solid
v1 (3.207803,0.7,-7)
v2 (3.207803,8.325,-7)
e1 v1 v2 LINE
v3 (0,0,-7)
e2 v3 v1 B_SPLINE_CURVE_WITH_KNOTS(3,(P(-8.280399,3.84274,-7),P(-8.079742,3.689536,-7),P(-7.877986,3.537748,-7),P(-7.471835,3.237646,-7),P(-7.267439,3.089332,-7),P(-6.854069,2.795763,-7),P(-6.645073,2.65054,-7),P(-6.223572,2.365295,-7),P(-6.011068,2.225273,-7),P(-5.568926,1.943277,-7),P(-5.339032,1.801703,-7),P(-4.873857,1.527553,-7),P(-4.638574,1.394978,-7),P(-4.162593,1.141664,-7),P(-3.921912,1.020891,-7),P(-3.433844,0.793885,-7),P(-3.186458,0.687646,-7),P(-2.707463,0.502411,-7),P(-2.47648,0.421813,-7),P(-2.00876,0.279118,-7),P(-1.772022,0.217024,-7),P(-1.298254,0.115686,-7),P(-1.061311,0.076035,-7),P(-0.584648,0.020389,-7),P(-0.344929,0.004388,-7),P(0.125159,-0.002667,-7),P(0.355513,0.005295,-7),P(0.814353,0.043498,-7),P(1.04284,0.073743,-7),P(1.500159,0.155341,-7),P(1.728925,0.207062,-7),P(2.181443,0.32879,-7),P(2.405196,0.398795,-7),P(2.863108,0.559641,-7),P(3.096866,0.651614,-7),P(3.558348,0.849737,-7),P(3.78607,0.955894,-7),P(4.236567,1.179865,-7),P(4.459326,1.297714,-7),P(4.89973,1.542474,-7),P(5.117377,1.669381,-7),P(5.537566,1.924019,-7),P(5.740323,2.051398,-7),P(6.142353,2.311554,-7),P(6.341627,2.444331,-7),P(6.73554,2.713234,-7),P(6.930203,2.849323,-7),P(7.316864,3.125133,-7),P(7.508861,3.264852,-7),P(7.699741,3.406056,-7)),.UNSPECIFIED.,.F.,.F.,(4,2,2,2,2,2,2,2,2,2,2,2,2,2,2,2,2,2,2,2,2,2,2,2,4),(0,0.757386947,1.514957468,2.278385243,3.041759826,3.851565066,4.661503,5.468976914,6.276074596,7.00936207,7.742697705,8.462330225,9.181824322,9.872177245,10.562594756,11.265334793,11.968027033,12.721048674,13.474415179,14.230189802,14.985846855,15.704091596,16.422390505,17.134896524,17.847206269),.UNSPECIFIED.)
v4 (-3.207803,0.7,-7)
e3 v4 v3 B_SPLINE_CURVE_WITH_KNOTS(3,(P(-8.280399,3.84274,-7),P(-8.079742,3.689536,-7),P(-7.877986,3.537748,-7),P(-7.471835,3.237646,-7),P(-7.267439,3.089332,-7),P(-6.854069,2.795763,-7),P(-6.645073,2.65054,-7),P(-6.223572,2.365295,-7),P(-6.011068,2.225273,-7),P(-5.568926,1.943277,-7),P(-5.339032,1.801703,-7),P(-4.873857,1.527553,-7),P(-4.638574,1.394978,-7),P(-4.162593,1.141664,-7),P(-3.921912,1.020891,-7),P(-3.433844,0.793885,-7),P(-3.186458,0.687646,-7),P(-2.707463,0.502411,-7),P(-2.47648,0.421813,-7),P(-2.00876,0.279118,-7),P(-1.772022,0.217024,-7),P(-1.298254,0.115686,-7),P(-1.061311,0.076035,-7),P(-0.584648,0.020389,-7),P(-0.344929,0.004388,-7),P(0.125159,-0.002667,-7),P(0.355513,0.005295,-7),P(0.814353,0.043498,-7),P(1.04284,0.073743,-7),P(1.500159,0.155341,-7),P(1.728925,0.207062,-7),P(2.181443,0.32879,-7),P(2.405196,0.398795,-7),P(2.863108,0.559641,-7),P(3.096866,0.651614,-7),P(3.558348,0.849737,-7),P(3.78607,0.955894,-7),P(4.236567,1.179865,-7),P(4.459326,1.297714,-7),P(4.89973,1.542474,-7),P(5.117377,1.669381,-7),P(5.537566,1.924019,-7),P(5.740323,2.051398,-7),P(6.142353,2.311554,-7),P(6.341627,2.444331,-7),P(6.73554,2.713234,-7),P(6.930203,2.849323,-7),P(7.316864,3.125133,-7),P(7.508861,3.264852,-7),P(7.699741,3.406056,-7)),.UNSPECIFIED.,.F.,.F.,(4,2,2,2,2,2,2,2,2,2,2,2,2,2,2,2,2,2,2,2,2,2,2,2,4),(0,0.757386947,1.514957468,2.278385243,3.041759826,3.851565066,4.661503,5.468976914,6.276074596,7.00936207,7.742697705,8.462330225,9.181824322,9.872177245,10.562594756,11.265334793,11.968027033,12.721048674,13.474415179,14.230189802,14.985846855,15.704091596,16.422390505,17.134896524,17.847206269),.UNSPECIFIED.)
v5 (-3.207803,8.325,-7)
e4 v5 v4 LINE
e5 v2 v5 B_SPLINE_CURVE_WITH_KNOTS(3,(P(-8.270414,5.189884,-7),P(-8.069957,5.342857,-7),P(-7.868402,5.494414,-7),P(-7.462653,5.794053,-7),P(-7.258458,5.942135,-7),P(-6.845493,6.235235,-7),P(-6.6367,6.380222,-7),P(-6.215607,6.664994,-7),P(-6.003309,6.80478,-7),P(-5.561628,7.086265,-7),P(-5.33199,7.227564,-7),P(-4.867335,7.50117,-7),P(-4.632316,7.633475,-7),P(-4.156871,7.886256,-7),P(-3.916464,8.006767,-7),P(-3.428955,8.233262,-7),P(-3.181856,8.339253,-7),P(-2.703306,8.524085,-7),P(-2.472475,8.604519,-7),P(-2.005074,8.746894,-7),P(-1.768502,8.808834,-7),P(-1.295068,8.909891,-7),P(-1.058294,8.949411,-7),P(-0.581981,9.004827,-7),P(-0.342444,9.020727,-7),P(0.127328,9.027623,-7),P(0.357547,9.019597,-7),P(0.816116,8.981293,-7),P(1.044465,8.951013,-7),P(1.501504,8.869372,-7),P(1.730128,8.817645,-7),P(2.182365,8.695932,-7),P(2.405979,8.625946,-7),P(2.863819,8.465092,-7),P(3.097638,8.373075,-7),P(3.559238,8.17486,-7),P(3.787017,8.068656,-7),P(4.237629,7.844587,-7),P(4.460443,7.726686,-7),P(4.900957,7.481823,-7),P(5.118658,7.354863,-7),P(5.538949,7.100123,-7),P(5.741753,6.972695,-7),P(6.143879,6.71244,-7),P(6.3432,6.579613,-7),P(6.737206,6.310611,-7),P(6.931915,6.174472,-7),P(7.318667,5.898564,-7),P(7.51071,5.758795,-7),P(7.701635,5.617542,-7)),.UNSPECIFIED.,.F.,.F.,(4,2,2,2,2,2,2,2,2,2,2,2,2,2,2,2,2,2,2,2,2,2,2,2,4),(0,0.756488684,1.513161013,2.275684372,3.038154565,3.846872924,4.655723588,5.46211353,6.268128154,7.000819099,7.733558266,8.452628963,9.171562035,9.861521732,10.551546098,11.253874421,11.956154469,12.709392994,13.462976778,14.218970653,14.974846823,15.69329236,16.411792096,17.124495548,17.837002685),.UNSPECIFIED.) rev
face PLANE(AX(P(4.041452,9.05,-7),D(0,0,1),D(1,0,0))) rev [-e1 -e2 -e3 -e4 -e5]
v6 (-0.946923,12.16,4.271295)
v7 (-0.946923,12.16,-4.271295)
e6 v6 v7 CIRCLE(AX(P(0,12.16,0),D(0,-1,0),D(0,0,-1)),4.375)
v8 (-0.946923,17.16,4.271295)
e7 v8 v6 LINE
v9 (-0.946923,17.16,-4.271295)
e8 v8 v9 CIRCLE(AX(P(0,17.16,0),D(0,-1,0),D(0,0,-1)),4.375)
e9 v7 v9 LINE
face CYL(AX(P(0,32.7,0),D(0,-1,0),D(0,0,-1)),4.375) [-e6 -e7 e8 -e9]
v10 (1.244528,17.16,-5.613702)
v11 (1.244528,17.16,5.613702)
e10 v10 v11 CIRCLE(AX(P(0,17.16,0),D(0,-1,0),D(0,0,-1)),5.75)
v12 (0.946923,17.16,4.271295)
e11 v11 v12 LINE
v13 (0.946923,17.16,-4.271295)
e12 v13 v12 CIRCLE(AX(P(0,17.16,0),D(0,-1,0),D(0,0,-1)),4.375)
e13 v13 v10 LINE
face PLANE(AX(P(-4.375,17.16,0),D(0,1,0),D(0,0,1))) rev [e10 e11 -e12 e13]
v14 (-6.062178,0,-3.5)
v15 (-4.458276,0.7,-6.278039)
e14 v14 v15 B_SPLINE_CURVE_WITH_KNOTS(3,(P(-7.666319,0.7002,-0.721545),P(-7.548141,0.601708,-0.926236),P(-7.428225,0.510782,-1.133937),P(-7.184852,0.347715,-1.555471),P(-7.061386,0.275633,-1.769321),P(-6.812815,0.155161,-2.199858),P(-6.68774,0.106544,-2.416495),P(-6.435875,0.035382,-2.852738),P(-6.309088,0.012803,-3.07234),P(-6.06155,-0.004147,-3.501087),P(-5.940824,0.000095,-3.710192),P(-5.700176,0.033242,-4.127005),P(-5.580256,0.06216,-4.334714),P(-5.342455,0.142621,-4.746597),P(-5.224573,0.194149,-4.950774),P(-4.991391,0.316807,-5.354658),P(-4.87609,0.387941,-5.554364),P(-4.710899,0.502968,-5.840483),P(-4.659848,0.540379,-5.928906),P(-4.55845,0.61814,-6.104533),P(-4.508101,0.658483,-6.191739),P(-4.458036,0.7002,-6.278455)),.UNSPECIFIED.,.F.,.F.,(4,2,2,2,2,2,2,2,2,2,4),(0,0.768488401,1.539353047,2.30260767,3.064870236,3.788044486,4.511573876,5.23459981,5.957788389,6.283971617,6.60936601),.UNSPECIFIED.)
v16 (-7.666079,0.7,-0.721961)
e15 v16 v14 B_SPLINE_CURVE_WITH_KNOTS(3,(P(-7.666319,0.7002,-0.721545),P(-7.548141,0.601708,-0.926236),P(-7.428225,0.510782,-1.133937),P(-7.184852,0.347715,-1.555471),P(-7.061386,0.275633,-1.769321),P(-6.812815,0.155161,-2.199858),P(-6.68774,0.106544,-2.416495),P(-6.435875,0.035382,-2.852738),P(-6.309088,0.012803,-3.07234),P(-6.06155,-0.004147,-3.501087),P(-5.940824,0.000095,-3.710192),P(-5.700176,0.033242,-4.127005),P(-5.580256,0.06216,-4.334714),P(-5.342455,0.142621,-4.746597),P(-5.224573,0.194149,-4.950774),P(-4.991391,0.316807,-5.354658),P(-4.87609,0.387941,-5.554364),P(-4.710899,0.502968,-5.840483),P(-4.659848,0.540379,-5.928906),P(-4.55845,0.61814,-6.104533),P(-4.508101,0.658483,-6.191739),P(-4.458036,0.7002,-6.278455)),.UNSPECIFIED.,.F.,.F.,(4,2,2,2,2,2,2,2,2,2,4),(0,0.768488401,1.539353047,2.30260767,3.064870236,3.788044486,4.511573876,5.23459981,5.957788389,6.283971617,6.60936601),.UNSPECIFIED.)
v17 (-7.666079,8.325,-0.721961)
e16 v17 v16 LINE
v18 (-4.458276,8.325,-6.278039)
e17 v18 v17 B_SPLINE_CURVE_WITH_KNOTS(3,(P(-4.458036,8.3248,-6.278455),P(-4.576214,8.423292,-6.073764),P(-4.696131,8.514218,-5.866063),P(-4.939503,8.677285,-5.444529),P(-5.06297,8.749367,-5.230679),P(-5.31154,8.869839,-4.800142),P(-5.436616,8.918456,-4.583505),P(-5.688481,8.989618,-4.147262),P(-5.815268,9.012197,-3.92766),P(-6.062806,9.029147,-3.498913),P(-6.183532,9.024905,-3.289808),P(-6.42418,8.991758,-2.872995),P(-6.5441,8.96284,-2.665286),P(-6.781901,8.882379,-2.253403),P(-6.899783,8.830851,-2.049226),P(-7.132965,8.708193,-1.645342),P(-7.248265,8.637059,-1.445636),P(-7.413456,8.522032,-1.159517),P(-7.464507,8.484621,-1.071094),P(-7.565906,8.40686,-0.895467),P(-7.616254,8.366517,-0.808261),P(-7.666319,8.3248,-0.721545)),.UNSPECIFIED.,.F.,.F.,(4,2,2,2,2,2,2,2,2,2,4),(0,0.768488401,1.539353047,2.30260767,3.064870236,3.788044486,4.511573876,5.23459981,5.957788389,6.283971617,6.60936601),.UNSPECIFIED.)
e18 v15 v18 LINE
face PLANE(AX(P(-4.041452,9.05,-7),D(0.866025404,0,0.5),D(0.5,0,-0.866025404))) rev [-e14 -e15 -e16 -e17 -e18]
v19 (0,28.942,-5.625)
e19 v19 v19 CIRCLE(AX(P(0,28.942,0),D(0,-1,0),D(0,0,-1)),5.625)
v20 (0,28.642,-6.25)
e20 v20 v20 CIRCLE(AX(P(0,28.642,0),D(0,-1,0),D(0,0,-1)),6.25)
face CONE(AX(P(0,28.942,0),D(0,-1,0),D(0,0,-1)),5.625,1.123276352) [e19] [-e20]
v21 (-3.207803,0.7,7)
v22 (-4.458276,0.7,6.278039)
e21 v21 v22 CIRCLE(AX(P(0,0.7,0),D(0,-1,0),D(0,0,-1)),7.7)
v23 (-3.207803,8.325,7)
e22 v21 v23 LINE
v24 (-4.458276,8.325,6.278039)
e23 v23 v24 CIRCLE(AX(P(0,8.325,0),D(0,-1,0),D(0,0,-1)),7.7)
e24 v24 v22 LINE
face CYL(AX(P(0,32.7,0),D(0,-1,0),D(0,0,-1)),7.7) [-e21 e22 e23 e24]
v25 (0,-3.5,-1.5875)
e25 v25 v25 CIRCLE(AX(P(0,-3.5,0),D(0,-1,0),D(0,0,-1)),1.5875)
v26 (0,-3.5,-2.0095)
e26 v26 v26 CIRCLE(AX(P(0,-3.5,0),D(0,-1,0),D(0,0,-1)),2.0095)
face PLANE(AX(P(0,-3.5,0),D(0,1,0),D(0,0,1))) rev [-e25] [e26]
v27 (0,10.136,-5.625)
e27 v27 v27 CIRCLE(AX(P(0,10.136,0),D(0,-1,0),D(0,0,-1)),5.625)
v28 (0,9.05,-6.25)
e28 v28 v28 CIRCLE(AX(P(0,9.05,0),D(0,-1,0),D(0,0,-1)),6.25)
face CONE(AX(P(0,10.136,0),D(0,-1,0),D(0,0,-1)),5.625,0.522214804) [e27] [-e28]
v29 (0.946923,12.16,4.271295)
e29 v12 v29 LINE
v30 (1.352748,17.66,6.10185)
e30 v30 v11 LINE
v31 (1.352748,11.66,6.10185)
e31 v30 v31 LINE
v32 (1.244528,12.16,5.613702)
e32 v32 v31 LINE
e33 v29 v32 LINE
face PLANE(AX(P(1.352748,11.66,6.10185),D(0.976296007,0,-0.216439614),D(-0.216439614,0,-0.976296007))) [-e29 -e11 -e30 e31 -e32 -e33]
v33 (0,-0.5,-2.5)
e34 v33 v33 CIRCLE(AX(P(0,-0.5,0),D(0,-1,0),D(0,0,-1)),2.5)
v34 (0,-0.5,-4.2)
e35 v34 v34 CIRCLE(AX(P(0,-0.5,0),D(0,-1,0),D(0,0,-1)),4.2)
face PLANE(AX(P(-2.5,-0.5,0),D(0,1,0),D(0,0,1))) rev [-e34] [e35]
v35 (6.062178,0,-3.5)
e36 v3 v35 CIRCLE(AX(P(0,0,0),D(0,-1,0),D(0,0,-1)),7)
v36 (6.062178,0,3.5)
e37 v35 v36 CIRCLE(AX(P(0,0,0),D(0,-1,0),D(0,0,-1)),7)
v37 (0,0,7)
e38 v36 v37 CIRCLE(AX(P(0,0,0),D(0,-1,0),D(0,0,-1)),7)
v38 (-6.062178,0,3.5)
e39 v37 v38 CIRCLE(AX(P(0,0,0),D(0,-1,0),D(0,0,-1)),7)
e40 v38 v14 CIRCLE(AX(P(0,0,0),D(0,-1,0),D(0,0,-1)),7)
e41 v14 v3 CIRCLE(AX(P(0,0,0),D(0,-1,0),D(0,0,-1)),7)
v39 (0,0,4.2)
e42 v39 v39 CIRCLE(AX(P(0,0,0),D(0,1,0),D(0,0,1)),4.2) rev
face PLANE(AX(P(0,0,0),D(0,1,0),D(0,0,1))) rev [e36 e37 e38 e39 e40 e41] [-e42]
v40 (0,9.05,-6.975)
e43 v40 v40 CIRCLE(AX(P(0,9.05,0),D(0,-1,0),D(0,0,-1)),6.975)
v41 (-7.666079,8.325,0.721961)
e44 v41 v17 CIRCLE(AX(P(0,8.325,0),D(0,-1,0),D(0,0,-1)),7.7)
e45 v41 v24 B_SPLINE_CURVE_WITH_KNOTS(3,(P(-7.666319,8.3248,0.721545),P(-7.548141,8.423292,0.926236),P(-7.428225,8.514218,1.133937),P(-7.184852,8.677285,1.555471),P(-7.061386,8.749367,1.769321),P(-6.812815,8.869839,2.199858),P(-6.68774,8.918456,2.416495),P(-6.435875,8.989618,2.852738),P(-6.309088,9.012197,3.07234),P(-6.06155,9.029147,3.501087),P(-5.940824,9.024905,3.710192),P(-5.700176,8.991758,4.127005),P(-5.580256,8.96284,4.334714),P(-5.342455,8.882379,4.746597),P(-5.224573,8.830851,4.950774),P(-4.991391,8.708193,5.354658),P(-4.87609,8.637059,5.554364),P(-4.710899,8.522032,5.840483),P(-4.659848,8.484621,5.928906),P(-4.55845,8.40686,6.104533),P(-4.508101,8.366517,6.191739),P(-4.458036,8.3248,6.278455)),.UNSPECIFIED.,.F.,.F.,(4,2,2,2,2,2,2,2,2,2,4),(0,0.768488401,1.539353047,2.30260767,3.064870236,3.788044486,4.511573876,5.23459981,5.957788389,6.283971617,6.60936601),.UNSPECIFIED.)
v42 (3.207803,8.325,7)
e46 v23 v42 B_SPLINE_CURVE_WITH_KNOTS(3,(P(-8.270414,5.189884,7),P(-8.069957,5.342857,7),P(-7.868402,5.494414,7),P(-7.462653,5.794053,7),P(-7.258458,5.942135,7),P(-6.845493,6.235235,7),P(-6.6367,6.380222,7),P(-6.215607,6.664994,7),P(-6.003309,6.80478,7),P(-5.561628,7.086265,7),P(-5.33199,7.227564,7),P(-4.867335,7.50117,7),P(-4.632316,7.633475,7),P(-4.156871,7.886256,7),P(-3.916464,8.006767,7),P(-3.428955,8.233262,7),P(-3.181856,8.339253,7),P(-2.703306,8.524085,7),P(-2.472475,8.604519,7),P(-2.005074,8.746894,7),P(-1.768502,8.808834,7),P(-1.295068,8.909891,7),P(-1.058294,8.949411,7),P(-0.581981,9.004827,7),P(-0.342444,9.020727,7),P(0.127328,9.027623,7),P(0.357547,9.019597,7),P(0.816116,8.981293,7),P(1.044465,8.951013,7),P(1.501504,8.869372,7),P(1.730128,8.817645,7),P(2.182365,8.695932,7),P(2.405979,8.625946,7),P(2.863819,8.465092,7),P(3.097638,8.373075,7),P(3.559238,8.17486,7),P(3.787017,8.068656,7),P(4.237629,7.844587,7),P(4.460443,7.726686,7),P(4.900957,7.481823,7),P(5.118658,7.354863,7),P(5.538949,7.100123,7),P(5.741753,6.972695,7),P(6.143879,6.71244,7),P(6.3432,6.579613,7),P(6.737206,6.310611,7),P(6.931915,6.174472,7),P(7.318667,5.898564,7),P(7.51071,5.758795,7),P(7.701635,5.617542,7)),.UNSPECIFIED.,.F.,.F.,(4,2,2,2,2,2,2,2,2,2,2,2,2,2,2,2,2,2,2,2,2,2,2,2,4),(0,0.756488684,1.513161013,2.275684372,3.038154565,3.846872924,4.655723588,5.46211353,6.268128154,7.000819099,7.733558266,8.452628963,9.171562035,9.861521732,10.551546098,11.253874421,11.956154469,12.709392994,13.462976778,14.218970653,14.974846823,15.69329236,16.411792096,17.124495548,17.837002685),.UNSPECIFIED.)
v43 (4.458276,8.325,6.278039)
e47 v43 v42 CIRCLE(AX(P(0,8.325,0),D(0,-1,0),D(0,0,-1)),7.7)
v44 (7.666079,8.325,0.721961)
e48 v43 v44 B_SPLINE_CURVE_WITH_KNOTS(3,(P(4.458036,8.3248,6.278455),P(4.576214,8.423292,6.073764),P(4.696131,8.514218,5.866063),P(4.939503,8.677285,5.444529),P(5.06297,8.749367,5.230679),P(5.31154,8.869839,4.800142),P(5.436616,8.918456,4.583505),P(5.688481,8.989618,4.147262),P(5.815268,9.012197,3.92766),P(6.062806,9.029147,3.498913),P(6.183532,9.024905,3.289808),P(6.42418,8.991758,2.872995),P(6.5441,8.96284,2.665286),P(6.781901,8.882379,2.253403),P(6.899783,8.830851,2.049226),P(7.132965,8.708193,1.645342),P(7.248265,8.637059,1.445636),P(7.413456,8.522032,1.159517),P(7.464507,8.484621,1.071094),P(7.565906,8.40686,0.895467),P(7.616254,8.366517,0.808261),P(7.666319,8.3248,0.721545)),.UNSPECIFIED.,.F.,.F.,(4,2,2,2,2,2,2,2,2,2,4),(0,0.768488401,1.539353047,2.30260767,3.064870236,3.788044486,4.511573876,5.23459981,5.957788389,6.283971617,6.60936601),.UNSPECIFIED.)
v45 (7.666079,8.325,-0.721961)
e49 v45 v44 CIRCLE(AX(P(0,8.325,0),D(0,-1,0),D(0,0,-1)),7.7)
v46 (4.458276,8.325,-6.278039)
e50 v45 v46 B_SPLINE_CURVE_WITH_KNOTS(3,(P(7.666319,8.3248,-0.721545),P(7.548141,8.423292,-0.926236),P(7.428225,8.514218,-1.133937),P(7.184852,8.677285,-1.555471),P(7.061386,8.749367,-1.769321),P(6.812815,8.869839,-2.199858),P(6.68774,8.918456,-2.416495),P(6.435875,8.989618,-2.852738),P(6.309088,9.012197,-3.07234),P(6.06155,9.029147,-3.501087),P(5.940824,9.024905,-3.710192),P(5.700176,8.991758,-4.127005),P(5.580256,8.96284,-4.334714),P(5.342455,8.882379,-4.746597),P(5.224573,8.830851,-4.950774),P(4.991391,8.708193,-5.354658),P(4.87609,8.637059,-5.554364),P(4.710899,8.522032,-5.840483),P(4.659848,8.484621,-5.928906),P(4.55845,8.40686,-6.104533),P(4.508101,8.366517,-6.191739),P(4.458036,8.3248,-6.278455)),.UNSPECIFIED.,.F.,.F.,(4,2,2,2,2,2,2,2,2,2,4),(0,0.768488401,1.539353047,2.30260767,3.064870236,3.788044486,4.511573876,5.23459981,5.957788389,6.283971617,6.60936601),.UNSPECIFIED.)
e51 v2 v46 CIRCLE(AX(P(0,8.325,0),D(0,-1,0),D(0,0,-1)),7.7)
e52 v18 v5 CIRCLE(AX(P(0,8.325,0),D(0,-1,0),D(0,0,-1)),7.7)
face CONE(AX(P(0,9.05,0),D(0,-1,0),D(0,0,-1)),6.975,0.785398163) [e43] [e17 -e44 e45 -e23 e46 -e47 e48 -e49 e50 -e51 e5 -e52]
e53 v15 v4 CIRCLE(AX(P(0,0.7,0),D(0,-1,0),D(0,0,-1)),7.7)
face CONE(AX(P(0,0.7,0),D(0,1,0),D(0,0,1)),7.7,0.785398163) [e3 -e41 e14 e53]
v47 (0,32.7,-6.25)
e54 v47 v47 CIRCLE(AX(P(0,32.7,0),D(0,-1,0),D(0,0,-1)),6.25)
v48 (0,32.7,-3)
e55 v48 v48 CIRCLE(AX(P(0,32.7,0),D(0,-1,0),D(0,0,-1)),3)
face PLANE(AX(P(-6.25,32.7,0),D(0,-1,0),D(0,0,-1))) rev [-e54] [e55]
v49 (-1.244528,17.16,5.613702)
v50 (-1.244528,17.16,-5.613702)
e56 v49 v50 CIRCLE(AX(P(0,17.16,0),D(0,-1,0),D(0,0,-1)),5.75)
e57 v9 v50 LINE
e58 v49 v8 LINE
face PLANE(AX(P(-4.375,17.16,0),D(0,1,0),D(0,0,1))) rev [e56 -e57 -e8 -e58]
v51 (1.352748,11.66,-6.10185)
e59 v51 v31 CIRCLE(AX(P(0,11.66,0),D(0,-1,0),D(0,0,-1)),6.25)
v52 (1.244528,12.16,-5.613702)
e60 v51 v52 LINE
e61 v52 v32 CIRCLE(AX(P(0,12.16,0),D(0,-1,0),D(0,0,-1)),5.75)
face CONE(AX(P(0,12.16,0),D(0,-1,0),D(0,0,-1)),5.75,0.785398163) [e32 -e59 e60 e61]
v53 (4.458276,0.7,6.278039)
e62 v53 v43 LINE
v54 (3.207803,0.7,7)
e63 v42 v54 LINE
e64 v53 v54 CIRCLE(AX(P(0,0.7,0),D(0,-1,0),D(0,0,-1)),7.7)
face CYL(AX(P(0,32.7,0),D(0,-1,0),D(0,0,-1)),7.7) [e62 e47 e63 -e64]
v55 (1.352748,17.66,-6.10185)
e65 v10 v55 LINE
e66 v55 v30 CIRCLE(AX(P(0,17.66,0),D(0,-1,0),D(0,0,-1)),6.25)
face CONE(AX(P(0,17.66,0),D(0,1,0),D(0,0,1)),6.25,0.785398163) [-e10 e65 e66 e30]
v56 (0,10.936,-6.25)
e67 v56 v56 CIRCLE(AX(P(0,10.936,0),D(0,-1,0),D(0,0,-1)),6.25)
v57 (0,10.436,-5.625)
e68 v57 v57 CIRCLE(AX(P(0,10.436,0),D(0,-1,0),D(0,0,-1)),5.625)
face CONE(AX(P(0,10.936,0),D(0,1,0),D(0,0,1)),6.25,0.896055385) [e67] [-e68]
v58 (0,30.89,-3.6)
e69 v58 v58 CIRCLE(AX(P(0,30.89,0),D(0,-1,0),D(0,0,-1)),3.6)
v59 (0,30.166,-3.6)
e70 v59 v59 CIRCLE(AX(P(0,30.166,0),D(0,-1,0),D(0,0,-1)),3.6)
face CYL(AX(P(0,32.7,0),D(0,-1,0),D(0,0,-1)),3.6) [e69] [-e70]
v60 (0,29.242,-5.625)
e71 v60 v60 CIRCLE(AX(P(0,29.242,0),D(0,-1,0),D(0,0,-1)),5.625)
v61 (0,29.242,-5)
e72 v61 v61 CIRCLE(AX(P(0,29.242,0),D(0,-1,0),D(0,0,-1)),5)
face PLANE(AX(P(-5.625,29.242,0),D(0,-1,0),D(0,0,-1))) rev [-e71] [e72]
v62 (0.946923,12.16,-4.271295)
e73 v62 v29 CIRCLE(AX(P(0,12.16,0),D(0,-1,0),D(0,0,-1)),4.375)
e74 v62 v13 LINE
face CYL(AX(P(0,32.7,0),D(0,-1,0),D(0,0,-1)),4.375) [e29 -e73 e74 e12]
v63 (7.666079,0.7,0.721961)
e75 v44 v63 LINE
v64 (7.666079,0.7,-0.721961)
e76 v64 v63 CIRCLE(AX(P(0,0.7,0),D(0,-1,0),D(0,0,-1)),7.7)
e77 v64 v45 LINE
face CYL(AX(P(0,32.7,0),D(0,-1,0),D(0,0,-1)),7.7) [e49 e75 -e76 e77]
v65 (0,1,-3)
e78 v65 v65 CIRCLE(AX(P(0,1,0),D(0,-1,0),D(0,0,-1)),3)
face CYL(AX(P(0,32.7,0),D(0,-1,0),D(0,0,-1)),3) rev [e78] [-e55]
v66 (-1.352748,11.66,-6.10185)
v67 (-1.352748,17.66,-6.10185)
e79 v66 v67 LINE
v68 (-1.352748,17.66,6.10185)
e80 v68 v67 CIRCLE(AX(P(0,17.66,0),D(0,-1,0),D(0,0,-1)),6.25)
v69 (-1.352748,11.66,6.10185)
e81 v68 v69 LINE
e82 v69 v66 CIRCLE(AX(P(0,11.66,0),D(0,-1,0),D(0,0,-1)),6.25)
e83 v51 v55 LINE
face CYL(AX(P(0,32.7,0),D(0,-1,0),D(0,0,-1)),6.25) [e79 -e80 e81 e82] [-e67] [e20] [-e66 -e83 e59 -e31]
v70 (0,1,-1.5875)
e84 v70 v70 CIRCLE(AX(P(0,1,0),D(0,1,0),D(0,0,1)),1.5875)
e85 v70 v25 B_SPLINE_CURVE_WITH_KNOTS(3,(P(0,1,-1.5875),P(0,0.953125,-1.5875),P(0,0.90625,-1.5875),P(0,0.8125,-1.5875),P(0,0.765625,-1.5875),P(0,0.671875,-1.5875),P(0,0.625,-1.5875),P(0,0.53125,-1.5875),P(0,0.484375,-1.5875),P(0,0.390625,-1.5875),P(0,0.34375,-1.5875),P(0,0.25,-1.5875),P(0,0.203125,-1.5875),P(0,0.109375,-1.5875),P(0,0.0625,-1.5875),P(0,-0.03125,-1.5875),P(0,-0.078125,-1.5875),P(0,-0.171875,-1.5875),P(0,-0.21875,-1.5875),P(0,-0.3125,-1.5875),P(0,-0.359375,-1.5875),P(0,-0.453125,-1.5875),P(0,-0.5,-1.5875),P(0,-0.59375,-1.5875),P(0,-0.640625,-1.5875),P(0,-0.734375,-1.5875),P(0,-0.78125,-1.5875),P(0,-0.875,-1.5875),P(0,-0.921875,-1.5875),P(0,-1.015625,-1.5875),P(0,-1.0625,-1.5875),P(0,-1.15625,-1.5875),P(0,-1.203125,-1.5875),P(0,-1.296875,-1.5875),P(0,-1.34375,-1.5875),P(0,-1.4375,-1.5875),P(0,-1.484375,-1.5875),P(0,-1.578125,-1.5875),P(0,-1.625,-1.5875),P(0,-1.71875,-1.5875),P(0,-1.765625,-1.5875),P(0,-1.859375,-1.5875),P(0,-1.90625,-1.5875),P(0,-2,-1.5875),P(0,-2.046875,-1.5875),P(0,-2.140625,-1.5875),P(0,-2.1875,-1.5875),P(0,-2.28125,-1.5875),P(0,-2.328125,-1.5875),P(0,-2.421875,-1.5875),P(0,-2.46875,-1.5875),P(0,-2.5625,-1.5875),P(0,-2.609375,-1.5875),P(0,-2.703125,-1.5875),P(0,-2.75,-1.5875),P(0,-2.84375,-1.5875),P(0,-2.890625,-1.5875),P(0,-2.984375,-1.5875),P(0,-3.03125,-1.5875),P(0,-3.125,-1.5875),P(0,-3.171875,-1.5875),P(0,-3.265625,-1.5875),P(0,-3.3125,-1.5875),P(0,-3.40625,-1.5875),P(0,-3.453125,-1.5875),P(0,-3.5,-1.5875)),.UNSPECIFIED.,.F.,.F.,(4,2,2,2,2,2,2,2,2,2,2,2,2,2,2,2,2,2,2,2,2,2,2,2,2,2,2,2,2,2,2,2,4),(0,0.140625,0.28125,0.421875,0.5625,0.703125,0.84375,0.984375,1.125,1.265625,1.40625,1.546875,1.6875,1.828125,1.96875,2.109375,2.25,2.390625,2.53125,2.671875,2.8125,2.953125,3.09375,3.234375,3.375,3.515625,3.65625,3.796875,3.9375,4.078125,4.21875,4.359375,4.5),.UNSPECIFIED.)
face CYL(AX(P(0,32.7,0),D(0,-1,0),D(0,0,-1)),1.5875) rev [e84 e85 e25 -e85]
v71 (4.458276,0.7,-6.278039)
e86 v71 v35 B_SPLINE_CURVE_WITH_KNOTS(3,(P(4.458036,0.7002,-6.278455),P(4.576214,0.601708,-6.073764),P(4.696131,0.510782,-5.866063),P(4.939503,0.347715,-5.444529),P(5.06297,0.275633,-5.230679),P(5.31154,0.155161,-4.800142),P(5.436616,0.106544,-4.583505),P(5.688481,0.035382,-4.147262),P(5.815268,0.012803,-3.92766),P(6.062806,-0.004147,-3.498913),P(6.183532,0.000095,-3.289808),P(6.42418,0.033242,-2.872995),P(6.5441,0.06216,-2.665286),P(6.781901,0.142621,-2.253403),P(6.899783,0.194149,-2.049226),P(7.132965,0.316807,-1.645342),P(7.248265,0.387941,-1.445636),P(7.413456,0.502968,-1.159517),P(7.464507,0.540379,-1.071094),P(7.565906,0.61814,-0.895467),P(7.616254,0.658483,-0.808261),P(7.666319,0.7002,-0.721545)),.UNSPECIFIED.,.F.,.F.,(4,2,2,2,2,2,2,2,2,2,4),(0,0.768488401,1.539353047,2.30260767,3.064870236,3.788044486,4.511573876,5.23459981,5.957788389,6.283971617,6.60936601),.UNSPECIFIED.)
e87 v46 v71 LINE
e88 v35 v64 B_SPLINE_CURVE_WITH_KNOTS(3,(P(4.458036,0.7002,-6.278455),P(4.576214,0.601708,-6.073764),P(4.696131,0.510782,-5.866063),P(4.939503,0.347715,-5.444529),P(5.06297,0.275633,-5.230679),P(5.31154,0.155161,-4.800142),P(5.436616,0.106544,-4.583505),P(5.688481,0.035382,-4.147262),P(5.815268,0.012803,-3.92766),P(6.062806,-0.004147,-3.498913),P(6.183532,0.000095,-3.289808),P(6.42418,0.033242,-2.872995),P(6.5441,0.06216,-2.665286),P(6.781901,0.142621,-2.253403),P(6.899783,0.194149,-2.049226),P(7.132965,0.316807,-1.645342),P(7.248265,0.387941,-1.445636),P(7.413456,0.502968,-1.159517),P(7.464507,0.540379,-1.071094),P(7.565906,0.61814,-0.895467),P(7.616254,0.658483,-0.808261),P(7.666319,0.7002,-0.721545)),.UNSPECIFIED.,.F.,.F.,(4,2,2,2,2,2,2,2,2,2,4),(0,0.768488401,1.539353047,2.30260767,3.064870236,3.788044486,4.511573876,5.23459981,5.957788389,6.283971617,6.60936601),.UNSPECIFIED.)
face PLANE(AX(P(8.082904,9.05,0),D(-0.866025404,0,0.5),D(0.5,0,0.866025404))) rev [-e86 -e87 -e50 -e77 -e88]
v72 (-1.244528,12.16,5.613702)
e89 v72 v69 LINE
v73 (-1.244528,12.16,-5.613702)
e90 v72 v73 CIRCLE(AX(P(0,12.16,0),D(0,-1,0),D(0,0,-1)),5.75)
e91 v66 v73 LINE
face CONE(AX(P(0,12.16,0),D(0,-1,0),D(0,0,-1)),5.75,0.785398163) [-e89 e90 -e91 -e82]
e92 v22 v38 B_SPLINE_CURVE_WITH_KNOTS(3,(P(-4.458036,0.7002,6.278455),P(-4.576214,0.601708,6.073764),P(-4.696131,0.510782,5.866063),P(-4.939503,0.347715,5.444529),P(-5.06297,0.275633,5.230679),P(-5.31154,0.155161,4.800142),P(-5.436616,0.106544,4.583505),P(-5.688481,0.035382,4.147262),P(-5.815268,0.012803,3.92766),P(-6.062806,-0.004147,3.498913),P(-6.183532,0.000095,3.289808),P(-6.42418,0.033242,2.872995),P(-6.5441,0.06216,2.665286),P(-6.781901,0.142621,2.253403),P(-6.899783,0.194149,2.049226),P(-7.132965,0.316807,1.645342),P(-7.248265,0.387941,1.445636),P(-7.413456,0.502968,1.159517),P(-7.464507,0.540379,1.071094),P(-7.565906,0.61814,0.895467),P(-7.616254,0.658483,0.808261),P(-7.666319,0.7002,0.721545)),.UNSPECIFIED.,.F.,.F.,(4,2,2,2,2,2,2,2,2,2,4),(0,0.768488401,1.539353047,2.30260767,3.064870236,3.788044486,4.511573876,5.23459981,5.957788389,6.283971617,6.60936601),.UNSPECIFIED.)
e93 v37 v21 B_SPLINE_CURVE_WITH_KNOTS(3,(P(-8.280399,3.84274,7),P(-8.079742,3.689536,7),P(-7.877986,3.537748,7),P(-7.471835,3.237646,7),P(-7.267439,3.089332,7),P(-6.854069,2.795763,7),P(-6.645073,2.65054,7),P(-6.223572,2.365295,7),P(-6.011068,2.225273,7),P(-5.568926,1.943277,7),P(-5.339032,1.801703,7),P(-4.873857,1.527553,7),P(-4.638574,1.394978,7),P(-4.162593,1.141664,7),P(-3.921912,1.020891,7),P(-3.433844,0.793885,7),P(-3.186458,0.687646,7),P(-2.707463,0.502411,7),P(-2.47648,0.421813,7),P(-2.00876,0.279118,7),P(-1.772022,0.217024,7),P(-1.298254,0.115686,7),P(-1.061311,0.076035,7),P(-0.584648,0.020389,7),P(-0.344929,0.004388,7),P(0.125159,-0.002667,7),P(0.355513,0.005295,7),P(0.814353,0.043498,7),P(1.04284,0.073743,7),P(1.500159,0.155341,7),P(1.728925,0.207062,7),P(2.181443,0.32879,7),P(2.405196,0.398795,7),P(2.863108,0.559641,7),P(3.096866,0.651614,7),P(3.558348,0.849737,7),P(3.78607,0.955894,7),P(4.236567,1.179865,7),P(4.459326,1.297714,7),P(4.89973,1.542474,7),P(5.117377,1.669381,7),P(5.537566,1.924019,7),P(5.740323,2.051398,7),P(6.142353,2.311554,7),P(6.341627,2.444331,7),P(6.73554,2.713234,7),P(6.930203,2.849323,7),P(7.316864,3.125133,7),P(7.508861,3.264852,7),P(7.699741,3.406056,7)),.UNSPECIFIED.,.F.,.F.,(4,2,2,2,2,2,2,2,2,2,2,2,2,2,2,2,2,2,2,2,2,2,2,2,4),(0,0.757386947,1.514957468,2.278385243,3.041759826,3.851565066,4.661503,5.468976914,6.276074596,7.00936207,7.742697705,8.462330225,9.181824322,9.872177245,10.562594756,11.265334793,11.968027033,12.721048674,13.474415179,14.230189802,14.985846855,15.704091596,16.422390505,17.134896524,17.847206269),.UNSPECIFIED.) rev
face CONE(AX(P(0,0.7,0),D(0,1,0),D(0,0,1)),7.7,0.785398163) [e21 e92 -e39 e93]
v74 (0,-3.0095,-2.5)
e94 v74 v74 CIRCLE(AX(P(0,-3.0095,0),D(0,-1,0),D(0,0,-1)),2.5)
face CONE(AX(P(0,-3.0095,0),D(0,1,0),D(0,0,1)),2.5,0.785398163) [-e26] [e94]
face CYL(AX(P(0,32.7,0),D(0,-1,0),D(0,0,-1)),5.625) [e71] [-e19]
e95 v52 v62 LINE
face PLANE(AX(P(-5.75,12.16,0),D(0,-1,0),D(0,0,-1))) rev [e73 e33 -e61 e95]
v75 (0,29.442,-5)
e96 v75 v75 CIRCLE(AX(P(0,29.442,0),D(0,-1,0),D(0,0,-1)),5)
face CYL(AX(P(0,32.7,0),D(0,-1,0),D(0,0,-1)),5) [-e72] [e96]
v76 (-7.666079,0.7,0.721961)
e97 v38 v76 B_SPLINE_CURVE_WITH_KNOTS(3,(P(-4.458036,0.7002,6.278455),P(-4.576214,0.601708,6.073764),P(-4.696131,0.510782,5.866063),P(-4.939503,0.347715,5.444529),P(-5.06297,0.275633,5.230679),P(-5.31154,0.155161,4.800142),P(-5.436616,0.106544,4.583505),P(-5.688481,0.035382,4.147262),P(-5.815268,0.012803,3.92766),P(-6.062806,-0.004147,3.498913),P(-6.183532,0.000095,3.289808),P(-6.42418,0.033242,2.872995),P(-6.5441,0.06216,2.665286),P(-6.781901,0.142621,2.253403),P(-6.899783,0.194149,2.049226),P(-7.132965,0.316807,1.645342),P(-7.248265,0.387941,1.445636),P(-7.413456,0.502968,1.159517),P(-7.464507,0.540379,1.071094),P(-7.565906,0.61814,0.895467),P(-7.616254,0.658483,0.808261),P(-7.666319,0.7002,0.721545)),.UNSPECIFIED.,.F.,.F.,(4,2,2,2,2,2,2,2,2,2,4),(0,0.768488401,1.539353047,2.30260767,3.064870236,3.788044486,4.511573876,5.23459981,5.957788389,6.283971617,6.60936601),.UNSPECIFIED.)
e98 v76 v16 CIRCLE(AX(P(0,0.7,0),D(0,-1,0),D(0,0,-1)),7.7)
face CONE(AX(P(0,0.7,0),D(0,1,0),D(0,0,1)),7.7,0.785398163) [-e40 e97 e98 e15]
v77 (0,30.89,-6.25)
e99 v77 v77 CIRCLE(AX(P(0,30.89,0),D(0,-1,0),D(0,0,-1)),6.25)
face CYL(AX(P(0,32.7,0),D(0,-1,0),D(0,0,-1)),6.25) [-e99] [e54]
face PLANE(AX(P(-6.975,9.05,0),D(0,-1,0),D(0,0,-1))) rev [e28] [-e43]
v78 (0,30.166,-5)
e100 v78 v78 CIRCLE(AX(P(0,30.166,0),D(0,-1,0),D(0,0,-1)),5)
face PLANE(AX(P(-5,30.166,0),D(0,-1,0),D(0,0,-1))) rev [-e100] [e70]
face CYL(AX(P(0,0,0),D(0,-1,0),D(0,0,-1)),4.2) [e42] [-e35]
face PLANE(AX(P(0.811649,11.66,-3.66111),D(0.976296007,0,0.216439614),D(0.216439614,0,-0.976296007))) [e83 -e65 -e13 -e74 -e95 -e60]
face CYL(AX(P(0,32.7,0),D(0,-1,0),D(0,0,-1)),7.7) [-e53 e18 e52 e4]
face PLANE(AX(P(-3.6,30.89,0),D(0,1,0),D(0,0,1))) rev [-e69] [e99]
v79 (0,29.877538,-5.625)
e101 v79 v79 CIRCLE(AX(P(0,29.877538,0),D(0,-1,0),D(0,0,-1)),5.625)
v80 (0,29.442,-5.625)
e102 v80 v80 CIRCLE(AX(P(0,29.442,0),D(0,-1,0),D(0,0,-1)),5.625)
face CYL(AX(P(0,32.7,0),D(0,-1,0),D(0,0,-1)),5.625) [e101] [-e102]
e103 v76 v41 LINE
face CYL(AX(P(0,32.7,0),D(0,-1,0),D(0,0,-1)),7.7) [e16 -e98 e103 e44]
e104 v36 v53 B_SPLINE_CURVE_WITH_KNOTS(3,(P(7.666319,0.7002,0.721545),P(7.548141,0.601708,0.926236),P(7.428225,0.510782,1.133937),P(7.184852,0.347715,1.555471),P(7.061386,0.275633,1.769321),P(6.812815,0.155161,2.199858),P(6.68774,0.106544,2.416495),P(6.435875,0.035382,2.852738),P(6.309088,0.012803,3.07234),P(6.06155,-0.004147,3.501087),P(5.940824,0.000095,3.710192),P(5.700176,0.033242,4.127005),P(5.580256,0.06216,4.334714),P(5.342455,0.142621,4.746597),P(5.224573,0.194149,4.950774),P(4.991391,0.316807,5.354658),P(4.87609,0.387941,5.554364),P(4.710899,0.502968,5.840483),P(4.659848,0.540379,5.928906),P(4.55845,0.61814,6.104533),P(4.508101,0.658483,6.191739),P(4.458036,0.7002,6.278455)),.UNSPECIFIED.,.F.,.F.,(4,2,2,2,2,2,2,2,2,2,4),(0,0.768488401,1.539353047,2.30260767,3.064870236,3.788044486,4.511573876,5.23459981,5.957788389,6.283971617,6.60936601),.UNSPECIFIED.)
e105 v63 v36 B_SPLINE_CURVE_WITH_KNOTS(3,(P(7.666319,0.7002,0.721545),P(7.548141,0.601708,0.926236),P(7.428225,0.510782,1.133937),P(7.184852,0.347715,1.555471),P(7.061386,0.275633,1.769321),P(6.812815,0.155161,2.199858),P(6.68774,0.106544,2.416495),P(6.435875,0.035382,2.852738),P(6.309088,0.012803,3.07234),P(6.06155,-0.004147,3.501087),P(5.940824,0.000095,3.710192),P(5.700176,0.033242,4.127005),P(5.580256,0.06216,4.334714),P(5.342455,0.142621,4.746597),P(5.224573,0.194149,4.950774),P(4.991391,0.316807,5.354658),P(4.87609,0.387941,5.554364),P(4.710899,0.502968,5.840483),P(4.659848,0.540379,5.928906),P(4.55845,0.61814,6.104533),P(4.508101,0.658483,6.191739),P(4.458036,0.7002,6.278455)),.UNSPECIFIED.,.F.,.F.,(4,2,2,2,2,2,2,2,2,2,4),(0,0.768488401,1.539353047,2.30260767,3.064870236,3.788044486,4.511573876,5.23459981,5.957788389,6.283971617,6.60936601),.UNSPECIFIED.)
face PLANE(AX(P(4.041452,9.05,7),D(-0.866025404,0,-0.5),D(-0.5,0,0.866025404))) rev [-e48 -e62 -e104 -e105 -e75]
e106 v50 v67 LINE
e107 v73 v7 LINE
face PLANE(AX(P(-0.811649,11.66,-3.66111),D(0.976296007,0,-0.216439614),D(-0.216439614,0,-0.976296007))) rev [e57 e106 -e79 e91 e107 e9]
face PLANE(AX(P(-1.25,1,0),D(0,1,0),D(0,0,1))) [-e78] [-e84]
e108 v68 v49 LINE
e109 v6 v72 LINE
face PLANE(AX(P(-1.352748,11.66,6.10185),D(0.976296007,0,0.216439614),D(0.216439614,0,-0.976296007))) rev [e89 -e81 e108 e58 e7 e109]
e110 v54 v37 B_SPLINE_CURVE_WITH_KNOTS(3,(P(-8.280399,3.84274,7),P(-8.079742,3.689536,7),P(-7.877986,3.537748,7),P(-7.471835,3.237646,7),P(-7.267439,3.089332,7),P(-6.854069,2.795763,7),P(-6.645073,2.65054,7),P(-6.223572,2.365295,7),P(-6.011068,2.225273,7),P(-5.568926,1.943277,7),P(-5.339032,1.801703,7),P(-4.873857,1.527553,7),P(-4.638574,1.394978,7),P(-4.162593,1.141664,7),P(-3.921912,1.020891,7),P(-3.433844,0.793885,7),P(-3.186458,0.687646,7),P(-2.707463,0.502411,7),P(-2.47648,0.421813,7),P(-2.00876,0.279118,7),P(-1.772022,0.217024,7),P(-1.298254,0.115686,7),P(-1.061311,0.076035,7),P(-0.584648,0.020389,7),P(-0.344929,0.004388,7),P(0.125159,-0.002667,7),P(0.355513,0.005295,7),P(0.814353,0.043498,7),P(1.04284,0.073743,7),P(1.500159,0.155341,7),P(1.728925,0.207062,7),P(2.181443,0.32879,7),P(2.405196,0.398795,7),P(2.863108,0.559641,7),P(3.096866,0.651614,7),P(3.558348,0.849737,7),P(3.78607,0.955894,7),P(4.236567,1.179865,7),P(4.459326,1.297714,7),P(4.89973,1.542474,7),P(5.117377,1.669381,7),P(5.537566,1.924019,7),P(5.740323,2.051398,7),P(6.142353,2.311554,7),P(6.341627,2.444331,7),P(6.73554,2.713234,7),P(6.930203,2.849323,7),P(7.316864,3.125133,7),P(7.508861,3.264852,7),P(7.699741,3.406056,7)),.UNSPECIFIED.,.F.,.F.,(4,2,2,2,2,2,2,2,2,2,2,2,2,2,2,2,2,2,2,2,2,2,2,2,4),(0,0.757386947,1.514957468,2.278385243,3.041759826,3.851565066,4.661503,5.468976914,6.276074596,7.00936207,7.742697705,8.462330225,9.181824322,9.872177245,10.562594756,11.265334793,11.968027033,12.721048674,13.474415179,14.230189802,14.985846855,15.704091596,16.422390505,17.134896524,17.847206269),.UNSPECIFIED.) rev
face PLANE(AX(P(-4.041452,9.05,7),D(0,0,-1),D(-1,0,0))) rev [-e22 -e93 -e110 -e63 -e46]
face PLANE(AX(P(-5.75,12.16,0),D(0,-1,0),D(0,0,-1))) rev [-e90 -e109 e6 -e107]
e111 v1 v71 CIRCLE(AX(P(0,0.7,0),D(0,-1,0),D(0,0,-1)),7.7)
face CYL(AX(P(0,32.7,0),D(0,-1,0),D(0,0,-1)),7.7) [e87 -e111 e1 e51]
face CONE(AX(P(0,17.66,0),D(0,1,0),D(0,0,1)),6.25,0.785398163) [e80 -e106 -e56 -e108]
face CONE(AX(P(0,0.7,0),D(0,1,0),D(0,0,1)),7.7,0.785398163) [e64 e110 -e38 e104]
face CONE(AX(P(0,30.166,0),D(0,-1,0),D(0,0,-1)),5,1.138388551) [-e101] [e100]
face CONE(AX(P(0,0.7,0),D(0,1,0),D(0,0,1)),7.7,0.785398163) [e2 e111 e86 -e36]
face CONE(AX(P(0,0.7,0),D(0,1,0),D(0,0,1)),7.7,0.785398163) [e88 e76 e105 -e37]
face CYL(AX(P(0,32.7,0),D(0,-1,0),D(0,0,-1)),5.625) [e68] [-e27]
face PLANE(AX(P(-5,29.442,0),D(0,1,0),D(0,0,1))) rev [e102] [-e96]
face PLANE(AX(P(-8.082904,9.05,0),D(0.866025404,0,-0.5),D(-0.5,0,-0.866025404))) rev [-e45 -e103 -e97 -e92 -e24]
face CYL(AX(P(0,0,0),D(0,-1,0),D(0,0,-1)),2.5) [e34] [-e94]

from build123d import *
from build123d.topology import SkipClean

# Parameters (mm, degrees)
SKETCH4_W                = 28
SKETCH4_H                = 28
CUT_EXTRUDE1_DEPTH       = 9.05
SKETCH5_W                = 2.5
SKETCH5_H                = 6
REVOLVE3_ANGLE           = 12.5
REVOLVE3_OTHER_WAY_ANGLE = 12.5
SKETCH6_W                = 2.5
SKETCH6_H                = 6
REVOLVE4_ANGLE           = 12.5
REVOLVE4_OTHER_WAY_ANGLE = 12.5
SKETCH7_R                = 1.5875
CUT_EXTRUDE2_DEPTH       = 38.666032443


with BuildPart() as part:
    # Sketch1 → Revolve1 (revolve)
    with BuildSketch(Plane.XY):
        Polygon((0, 0), (-7, 0), (-7.7, 0.7), (-7.7, 8.325), (-6.975, 9.05), (-6.25, 9.05), (-5.625, 10.136), (-5.625, 10.436), (-6.25, 10.936), (-6.25, 11.66), (-5.75, 12.16), (-4.375, 12.16), (-4.375, 17.16), (-5.75, 17.16), (-6.25, 17.66), (-6.25, 28.642), (-5.625, 28.942), (-5.625, 29.242), (-5, 29.242), (-5, 29.442), (-5.625, 29.442), (-5.625, 29.877538462), (-5, 30.166), (-3.6, 30.166), (-3.6, 30.89), (-6.25, 30.89), (-6.25, 32.7), (0, 32.7), align=None)
    revolve(axis=Axis((0, 32.7, 0), (0, -1, 0)))

    # Sketch2 → Revolve2 (revolve)
    with BuildSketch(Plane.XY):
        Polygon((0, -3.5), (-2.0095, -3.5), (-2.5, -3.0095), (-2.5, -0.5), (-4.2, -0.5), (-4.2, 0), (0, 0), align=None)
    revolve(axis=Axis((0, 0, 0), (0, -1, 0)))

    # Sketch3 → Cut-Revolve1 (revolve, cut)
    with BuildSketch(Plane.XY):
        Polygon((0, -3.5), (-1.25, -3.5), (-1.25, 1), (-3, 1), (-3, 32.7), (0, 32.7), align=None)
    revolve(axis=Axis((0, 32.7, 0), (0, -1, 0)), mode=Mode.SUBTRACT)

    # Sketch4 → Cut-Extrude1 (cut)
    with BuildSketch(Plane(origin=(0, 0, 0), x_dir=(-1, 0, 0), z_dir=(0, 1, 0))):
        Rectangle(SKETCH4_W, SKETCH4_H)
        Polygon((8.082903769, 0), (4.041451884, 7), (-4.041451884, 7), (-8.082903769, 0), (-4.041451884, -7), (4.041451884, -7), align=None, mode=Mode.SUBTRACT)
    extrude(amount=CUT_EXTRUDE1_DEPTH, mode=Mode.SUBTRACT)

    # Sketch5 → Revolve3 (revolve)
    with SkipClean():  # the faces are left unmerged after this step: merging them gives an invalid solid
        with BuildSketch(Plane(origin=(0, 0, 0), x_dir=(0, 0, -1), z_dir=(1, 0, 0))):
            with Locations((5, 14.66)):
                Rectangle(SKETCH5_W, SKETCH5_H)
        revolve(axis=Axis((0, 11.66, 0), (0, 1, 0)), revolution_arc=REVOLVE3_ANGLE)

    # Sketch5 → Revolve3 other way (revolve)
    with SkipClean():  # the faces are left unmerged after this step: merging them gives an invalid solid
        with BuildSketch(Plane(origin=(0, 0, 0), x_dir=(0, 0, -1), z_dir=(1, 0, 0))):
            with Locations((5, 14.66)):
                Rectangle(SKETCH5_W, SKETCH5_H)
        revolve(axis=Axis((0, 11.66, 0), (0, -1, 0)), revolution_arc=REVOLVE3_OTHER_WAY_ANGLE)

    # Sketch6 → Revolve4 (revolve)
    with SkipClean():  # the faces are left unmerged after this step: merging them gives an invalid solid
        with BuildSketch(Plane(origin=(0, 0, 0), x_dir=(0, 0, -1), z_dir=(1, 0, 0))):
            with Locations((-5, 14.66)):
                Rectangle(SKETCH6_W, SKETCH6_H)
        revolve(axis=Axis((0, 17.66, 0), (0, -1, 0)), revolution_arc=REVOLVE4_ANGLE)

    # Sketch6 → Revolve4 other way (revolve)
    with SkipClean():  # the faces are left unmerged after this step: merging them gives an invalid solid
        with BuildSketch(Plane(origin=(0, 0, 0), x_dir=(0, 0, -1), z_dir=(1, 0, 0))):
            with Locations((-5, 14.66)):
                Rectangle(SKETCH6_W, SKETCH6_H)
        revolve(axis=Axis((0, 17.66, 0), (0, 1, 0)), revolution_arc=REVOLVE4_OTHER_WAY_ANGLE)

    # Sketch7 → Cut-Extrude2 (cut, through all)
    with SkipClean():  # the faces are left unmerged after this step: merging them gives an invalid solid
        with BuildSketch(Plane.XZ.offset(3.5)):
            Circle(SKETCH7_R)
        extrude(amount=-CUT_EXTRUDE2_DEPTH, mode=Mode.SUBTRACT)


solid = part.part
